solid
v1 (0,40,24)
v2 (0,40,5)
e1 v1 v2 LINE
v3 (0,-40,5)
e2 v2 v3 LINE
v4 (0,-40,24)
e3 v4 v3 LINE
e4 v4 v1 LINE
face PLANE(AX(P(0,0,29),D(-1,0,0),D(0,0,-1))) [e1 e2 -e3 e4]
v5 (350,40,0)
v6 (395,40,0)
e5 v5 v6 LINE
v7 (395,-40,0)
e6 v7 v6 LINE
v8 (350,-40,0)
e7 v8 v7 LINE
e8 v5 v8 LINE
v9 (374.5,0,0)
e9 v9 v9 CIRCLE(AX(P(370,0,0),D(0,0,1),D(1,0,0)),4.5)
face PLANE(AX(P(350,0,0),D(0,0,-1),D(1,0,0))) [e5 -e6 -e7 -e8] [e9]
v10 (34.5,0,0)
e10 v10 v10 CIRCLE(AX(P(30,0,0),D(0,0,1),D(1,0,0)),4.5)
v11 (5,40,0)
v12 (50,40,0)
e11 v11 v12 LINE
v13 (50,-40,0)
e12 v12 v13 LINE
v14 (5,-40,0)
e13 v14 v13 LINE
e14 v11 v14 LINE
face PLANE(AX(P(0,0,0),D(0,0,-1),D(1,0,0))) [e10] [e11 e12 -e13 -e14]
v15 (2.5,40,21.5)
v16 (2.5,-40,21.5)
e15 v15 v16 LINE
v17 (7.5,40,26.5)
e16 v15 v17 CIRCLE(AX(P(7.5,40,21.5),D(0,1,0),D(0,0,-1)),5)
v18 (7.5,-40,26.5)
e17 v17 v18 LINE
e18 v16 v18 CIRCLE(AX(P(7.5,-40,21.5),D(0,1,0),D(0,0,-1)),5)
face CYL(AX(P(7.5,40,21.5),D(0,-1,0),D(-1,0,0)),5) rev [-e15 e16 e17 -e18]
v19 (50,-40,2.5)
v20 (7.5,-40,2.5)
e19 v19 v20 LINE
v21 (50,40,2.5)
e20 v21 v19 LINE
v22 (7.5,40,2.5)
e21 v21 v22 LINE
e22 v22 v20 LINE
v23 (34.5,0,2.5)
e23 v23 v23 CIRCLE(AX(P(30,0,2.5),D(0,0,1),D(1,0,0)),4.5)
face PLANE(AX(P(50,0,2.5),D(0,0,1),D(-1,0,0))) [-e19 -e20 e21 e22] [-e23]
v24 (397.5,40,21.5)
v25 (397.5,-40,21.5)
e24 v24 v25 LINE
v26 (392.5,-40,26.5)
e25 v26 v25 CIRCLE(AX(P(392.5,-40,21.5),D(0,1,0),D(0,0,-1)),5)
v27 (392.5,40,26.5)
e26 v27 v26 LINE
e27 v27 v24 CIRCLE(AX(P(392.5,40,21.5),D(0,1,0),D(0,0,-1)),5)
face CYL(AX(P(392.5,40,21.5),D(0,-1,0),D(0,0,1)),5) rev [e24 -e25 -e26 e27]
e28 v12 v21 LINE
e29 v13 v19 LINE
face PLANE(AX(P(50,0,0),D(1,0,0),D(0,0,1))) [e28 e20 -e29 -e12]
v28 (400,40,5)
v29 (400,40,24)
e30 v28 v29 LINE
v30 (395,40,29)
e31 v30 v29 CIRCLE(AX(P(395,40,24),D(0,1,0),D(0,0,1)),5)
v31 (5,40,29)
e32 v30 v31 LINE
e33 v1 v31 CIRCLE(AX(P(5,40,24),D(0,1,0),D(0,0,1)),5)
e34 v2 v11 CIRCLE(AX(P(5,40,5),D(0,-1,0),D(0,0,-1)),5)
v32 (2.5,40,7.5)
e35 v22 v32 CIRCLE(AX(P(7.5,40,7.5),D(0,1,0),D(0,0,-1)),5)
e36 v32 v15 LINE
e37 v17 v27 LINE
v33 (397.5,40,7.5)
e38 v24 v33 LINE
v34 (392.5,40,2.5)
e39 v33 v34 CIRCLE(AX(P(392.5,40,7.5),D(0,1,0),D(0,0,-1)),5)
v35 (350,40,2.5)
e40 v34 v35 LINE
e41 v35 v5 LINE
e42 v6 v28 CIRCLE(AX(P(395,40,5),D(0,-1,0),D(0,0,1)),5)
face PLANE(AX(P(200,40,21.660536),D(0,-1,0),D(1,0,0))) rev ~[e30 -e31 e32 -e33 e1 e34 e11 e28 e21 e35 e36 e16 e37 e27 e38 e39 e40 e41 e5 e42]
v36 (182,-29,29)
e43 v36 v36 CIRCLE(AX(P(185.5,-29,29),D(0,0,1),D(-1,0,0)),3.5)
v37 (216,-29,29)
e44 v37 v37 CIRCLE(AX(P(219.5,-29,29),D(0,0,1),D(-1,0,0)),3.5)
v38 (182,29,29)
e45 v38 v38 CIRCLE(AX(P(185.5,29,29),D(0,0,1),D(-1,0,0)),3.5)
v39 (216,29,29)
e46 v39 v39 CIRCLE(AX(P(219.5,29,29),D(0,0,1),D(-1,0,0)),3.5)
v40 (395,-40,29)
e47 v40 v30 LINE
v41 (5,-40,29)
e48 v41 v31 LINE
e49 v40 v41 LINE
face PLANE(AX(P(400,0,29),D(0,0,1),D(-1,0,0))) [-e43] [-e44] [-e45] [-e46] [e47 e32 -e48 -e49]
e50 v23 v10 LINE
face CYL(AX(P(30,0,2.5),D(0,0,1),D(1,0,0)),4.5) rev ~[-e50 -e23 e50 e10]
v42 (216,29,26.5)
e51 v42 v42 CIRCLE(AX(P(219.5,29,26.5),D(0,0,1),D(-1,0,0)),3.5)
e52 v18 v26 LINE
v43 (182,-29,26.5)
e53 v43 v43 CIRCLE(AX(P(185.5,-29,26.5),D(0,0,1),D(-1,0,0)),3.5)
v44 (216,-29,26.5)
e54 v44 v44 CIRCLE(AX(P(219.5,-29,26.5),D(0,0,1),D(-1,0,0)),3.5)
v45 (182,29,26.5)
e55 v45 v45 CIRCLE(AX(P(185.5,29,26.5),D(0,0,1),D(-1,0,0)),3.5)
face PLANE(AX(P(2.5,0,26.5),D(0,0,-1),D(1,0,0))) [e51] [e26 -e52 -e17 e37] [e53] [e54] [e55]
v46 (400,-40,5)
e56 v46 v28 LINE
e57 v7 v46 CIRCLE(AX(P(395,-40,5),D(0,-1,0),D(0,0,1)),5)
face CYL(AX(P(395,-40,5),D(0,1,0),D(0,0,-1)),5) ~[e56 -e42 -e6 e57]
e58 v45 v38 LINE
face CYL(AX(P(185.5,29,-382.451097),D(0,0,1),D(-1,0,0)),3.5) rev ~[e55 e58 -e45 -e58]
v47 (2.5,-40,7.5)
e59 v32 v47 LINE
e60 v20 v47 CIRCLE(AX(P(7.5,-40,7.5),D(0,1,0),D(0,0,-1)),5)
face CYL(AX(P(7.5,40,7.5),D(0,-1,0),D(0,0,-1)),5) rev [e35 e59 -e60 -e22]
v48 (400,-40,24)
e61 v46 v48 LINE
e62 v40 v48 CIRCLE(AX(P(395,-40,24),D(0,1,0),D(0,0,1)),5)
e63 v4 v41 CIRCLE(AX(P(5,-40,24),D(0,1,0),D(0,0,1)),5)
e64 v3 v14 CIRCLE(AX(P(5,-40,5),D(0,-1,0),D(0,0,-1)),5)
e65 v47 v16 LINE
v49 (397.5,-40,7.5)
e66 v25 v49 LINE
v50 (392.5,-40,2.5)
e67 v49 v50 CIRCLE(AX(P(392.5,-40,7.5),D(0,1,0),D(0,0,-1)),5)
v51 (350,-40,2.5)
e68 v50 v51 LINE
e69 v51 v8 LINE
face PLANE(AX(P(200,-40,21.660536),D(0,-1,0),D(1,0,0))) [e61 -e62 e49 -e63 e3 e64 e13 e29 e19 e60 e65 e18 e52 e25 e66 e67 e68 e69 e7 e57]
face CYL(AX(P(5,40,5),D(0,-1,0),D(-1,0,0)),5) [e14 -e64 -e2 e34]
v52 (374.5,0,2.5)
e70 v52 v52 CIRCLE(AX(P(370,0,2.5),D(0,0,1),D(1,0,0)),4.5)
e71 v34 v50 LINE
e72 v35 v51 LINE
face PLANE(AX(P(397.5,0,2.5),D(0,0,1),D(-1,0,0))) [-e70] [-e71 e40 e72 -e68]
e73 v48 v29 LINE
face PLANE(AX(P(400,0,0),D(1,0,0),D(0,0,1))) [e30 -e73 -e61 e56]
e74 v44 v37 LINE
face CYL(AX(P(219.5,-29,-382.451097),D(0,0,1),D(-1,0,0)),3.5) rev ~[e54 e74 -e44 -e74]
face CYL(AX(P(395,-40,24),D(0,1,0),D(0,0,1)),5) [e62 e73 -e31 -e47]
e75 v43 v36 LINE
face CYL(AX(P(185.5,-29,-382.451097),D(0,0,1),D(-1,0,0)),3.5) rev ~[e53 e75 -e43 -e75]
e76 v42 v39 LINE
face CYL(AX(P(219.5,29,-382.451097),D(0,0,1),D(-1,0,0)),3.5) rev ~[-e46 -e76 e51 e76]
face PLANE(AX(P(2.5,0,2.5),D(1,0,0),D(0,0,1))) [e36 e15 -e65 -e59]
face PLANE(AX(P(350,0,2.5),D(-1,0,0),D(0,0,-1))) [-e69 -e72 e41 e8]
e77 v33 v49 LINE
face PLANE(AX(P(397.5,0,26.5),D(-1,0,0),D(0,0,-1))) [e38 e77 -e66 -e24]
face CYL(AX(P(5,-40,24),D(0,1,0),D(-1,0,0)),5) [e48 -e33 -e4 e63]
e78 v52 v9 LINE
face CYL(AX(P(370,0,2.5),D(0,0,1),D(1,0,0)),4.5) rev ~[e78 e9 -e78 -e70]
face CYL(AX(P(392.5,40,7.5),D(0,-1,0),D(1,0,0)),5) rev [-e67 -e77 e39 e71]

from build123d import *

# Parameters (mm, degrees)
F1_DEPTH = 40
F4_D     = 9
F4_DEPTH = 12
F4_TIP   = 2.7038727856
F5_D     = 9
F5_DEPTH = 12
F5_TIP   = 2.7038727856
F7_D     = 7
F8_R     = 5


# Not quite as in the source:
# - a feature names something its author has since deleted; it is built from what else it names


with BuildPart() as f1:
    # F0 (on Front) → F1 (new body, symmetric)
    with BuildSketch(Plane.XZ):
        Polygon((0, 29), (0, 0), (50, 0), (50, 2.5), (2.5, 2.5), (2.5, 26.5), (397.5, 26.5), (397.5, 2.5), (350, 2.5), (350, 0), (400, 0), (400, 29), align=None)
    extrude(amount=F1_DEPTH, both=True)

    # F4 (one way)
    with BuildSketch(Plane.XY.offset(2.5)):
        with Locations((370, 0)):
            Circle(F4_D / 2)
    extrude(amount=-F4_DEPTH, mode=Mode.SUBTRACT)
    with Locations(Plane.XY.offset(2.5)):
        with Locations((370, 0)):
            with Locations((0, 0, -(F4_DEPTH + F4_TIP / 2))):  # 118° drill point
                Cone(0, F4_D / 2, F4_TIP, mode=Mode.SUBTRACT)

    # F5 (one way)
    with BuildSketch(Plane.XY.offset(2.5)):
        with Locations((30, 0)):
            Circle(F5_D / 2)
    extrude(amount=-F5_DEPTH, mode=Mode.SUBTRACT)
    with Locations(Plane.XY.offset(2.5)):
        with Locations((30, 0)):
            with Locations((0, 0, -(F5_DEPTH + F5_TIP / 2))):  # 118° drill point
                Cone(0, F5_D / 2, F5_TIP, mode=Mode.SUBTRACT)

    # F7 (through all)
    with Locations(Plane(origin=(0, 0, 26.5), x_dir=(1, 0, 0), z_dir=(0, 0, -1))):
        with Locations((219.5, -29), (185.5, -29), (185.5, 29), (219.5, 29)):
            Hole(F7_D / 2)

    # F8
    f8_edges = [f1.edges().sort_by_distance(p)[0] for p in [
        (0, 0, 29),
        (0, 0, 0),
        (400, 0, 29),
        (400, 0, 0),
        (2.5, 0, 2.5),
        (2.5, 0, 26.5),
        (397.5, 0, 2.5),
        (397.5, 0, 26.5),
    ]]
    fillet(f8_edges, radius=F8_R)


solid = f1.part
